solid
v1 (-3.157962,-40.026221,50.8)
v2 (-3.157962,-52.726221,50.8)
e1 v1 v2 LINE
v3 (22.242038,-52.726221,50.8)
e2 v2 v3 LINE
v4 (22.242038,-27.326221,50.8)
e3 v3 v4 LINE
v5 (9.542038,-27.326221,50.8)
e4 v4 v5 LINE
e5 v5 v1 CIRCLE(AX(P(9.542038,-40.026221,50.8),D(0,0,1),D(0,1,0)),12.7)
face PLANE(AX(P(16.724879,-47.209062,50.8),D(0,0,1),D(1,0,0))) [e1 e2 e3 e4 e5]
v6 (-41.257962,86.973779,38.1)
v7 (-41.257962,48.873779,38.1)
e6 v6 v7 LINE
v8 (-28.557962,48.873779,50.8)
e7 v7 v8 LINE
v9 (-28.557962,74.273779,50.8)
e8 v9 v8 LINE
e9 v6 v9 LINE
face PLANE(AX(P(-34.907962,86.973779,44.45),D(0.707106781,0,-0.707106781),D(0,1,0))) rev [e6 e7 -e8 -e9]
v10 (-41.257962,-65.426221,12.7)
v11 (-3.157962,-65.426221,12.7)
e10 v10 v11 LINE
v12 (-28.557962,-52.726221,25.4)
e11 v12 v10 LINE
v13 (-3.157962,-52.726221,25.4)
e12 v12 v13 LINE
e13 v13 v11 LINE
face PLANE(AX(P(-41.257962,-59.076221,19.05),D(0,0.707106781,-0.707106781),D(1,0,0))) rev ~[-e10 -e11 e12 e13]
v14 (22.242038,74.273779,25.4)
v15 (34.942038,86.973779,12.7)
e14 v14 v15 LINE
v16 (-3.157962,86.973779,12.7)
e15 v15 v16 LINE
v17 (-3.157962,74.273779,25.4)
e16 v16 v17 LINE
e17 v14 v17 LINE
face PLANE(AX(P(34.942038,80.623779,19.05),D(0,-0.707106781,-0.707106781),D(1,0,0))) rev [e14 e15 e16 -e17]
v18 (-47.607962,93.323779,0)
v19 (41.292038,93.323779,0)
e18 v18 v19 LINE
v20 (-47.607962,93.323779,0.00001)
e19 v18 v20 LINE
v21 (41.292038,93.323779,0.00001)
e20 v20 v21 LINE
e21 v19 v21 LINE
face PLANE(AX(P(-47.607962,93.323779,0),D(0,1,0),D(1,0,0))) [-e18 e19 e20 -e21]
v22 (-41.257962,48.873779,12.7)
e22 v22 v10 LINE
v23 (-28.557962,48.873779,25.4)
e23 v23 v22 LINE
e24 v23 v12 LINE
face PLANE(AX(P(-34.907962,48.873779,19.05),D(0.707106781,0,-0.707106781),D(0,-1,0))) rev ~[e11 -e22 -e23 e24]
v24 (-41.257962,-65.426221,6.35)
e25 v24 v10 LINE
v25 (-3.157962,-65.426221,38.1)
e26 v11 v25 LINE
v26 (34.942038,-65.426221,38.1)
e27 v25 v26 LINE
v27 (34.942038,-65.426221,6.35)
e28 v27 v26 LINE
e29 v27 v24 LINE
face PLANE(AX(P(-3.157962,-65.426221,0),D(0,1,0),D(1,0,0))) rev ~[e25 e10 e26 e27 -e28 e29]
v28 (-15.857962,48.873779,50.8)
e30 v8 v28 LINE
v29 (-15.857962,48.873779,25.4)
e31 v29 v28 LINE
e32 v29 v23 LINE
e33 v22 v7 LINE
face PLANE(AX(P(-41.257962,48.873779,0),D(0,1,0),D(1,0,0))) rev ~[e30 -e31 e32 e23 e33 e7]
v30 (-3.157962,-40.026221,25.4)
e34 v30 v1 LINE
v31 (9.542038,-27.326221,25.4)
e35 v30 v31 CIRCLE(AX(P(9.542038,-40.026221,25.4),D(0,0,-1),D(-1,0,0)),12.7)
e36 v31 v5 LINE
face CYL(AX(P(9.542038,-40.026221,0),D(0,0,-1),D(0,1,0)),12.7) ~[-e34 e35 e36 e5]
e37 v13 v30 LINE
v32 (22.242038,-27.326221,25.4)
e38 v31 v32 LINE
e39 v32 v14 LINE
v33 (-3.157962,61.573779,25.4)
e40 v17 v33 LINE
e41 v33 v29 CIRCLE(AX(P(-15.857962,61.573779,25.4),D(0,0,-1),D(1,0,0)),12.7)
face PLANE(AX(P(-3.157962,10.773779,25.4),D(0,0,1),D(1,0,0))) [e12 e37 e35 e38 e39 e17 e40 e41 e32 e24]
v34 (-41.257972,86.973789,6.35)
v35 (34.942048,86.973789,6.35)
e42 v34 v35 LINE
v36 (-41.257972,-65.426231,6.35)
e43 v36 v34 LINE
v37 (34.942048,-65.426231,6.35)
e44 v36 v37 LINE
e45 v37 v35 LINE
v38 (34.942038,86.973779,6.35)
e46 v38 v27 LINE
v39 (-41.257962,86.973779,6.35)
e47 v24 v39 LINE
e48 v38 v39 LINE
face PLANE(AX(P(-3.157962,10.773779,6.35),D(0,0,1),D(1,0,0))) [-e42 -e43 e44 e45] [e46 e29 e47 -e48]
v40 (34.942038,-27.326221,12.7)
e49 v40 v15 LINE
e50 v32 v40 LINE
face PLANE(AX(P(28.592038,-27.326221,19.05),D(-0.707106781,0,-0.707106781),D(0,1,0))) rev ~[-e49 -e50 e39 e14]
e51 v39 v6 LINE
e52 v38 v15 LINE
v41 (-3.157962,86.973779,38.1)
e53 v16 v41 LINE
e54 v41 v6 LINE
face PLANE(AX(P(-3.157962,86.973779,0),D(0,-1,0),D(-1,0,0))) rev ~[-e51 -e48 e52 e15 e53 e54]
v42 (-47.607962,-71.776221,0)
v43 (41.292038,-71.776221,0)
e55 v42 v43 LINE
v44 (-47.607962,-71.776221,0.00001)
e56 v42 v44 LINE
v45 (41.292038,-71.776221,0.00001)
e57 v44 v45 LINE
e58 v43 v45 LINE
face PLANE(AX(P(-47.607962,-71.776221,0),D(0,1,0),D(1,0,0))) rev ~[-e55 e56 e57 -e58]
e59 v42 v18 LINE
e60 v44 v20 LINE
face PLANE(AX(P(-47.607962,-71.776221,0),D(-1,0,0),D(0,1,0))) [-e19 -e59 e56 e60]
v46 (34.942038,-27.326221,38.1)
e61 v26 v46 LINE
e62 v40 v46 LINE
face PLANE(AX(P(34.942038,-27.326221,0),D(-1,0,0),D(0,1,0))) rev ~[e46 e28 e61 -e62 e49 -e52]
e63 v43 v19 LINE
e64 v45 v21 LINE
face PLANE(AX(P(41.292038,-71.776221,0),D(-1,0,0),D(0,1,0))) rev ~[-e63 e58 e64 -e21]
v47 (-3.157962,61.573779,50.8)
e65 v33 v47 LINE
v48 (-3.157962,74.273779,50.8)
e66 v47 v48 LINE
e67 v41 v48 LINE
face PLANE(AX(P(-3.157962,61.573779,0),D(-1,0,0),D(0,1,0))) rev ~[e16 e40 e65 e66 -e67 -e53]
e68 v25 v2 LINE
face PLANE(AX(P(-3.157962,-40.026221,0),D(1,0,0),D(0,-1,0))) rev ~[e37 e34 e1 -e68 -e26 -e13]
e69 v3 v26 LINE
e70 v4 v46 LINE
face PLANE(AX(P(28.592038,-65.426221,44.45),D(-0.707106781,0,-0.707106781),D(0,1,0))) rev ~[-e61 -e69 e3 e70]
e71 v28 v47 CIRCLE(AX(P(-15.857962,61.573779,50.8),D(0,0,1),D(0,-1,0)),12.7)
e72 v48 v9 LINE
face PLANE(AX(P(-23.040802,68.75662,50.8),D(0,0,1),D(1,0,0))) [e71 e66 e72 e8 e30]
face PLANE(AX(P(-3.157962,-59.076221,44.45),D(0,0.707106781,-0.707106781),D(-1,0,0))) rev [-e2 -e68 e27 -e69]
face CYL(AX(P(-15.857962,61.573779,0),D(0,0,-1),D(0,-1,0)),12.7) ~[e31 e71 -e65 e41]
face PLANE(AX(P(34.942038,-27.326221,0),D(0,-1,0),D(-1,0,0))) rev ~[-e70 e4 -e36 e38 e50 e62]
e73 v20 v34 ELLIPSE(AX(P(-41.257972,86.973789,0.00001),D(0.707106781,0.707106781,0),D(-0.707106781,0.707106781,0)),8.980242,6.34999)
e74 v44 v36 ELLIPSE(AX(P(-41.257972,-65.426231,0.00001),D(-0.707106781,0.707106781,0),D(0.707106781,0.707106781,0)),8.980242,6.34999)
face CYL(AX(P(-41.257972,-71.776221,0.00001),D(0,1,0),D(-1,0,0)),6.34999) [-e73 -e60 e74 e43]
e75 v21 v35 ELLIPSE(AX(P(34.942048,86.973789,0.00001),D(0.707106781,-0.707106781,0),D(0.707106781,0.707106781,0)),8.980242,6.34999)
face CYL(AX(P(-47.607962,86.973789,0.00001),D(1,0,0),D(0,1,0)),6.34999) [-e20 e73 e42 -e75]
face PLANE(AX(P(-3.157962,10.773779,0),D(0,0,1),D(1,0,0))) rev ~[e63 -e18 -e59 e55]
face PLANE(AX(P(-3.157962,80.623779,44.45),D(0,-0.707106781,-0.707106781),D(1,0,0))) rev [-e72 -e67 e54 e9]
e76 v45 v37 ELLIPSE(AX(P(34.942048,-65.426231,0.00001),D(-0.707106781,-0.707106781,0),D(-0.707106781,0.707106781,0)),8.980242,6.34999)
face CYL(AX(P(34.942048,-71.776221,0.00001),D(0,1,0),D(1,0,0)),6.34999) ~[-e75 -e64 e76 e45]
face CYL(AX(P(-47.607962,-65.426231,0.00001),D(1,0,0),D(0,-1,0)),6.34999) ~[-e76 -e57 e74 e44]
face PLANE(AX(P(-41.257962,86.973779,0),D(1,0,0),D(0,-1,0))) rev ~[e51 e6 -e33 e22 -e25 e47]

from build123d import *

# Parameters (mm, degrees)
F0_W     = 88.9
F0_H     = 165.1
F1_DEPTH = 6.35
F2_R     = 6.34999
F3_DEPTH = 25.4
F4_SIZE  = 12.7
F5_DEPTH = 50.8
F6_SIZE  = 12.7


# Not quite as in the source:
# - a fillet or chamfer is up to 0.001 mm smaller than in the source, because OpenCascade refuses the exact size


with BuildPart() as f1:
    # F0 (on Top) → F1 (new body)
    with BuildSketch(Plane.XY):
        with Locations((-3.1579616427, 10.7737789035)):
            Rectangle(F0_W, F0_H)
        Polygon((-41.2579616427, 48.8737789035), (-41.2579616427, 86.9737789035), (-3.1579616427, 86.9737789035), (34.9420383573, 86.9737789035), (34.9420383573, -27.3262210965), (34.9420383573, -65.4262210965), (-3.1579616427, -65.4262210965), (-41.2579616427, -65.4262210965), align=None, mode=Mode.SUBTRACT)
    extrude(amount=F1_DEPTH)

    # F2 (radius 6.35 in the source; OpenCascade refuses exactly that, so slightly less here)
    f2_edges = [f1.edges().sort_by_distance(p)[0] for p in [
        (-47.607962, 10.773779, 6.35),
        (-3.157962, 93.323779, 6.35),
        (41.292038, 10.773779, 6.35),
        (-3.157962, -71.776221, 6.35),
    ]]
    fillet(f2_edges, radius=F2_R)

    # F0 (on Top) → F3 (join)
    with BuildSketch(Plane.XY):
        with BuildLine():
            Line((34.9420383573, 86.9737789035), (-3.1579616427, 86.9737789035))
            Line((-3.1579616427, 86.9737789035), (-3.1579616427, 61.5737789035))
            ThreePointArc((-3.1579616427, 61.5737789035), (-6.8777055217, 52.5935227824), (-15.8579616427, 48.8737789035))
            Line((-15.8579616427, 48.8737789035), (-41.2579616427, 48.8737789035))
            Line((-41.2579616427, 48.8737789035), (-41.2579616427, -65.4262210965))
            Line((-41.2579616427, -65.4262210965), (-3.1579616427, -65.4262210965))
            Line((-3.1579616427, -65.4262210965), (-3.1579616427, -40.0262210965))
            ThreePointArc((-3.1579616427, -40.0262210965), (0.5617822362, -31.0459649754), (9.5420383573, -27.3262210965))
            Line((9.5420383573, -27.3262210965), (34.9420383573, -27.3262210965))
            Line((34.9420383573, -27.3262210965), (34.9420383573, 86.9737789035))
        make_face()
    extrude(amount=F3_DEPTH)

    # F4
    f4_edges = [f1.edges().sort_by_distance(p)[0] for p in [
        (34.942038, 29.823779, 25.4),
        (15.892038, 86.973779, 25.4),
        (-41.257962, -8.276221, 25.4),
        (-22.207962, -65.426221, 25.4),
    ]]
    chamfer(f4_edges, length=F4_SIZE)

    # F0 (on Top) → F5 (join)
    with BuildSketch(Plane.XY):
        with BuildLine():
            Line((-3.1579616427, 86.9737789035), (-41.2579616427, 86.9737789035))
            Line((-41.2579616427, 86.9737789035), (-41.2579616427, 48.8737789035))
            Line((-41.2579616427, 48.8737789035), (-15.8579616427, 48.8737789035))
            ThreePointArc((-15.8579616427, 48.8737789035), (-6.8777055217, 52.5935227824), (-3.1579616427, 61.5737789035))
            Line((-3.1579616427, 61.5737789035), (-3.1579616427, 86.9737789035))
        make_face()
        with BuildLine():
            Line((34.9420383573, -65.4262210965), (34.9420383573, -27.3262210965))
            Line((34.9420383573, -27.3262210965), (9.5420383573, -27.3262210965))
            ThreePointArc((9.5420383573, -27.3262210965), (0.5617822362, -31.0459649754), (-3.1579616427, -40.0262210965))
            Line((-3.1579616427, -40.0262210965), (-3.1579616427, -65.4262210965))
            Line((-3.1579616427, -65.4262210965), (34.9420383573, -65.4262210965))
        make_face()
    extrude(amount=F5_DEPTH)

    # F6
    f6_edges = [f1.edges().sort_by_distance(p)[0] for p in [
        (-22.207962, 86.973779, 50.8),
        (-41.257962, 67.923779, 50.8),
        (34.942038, -46.376221, 50.8),
        (15.892038, -65.426221, 50.8),
    ]]
    chamfer(f6_edges, length=F6_SIZE)


solid = f1.part
